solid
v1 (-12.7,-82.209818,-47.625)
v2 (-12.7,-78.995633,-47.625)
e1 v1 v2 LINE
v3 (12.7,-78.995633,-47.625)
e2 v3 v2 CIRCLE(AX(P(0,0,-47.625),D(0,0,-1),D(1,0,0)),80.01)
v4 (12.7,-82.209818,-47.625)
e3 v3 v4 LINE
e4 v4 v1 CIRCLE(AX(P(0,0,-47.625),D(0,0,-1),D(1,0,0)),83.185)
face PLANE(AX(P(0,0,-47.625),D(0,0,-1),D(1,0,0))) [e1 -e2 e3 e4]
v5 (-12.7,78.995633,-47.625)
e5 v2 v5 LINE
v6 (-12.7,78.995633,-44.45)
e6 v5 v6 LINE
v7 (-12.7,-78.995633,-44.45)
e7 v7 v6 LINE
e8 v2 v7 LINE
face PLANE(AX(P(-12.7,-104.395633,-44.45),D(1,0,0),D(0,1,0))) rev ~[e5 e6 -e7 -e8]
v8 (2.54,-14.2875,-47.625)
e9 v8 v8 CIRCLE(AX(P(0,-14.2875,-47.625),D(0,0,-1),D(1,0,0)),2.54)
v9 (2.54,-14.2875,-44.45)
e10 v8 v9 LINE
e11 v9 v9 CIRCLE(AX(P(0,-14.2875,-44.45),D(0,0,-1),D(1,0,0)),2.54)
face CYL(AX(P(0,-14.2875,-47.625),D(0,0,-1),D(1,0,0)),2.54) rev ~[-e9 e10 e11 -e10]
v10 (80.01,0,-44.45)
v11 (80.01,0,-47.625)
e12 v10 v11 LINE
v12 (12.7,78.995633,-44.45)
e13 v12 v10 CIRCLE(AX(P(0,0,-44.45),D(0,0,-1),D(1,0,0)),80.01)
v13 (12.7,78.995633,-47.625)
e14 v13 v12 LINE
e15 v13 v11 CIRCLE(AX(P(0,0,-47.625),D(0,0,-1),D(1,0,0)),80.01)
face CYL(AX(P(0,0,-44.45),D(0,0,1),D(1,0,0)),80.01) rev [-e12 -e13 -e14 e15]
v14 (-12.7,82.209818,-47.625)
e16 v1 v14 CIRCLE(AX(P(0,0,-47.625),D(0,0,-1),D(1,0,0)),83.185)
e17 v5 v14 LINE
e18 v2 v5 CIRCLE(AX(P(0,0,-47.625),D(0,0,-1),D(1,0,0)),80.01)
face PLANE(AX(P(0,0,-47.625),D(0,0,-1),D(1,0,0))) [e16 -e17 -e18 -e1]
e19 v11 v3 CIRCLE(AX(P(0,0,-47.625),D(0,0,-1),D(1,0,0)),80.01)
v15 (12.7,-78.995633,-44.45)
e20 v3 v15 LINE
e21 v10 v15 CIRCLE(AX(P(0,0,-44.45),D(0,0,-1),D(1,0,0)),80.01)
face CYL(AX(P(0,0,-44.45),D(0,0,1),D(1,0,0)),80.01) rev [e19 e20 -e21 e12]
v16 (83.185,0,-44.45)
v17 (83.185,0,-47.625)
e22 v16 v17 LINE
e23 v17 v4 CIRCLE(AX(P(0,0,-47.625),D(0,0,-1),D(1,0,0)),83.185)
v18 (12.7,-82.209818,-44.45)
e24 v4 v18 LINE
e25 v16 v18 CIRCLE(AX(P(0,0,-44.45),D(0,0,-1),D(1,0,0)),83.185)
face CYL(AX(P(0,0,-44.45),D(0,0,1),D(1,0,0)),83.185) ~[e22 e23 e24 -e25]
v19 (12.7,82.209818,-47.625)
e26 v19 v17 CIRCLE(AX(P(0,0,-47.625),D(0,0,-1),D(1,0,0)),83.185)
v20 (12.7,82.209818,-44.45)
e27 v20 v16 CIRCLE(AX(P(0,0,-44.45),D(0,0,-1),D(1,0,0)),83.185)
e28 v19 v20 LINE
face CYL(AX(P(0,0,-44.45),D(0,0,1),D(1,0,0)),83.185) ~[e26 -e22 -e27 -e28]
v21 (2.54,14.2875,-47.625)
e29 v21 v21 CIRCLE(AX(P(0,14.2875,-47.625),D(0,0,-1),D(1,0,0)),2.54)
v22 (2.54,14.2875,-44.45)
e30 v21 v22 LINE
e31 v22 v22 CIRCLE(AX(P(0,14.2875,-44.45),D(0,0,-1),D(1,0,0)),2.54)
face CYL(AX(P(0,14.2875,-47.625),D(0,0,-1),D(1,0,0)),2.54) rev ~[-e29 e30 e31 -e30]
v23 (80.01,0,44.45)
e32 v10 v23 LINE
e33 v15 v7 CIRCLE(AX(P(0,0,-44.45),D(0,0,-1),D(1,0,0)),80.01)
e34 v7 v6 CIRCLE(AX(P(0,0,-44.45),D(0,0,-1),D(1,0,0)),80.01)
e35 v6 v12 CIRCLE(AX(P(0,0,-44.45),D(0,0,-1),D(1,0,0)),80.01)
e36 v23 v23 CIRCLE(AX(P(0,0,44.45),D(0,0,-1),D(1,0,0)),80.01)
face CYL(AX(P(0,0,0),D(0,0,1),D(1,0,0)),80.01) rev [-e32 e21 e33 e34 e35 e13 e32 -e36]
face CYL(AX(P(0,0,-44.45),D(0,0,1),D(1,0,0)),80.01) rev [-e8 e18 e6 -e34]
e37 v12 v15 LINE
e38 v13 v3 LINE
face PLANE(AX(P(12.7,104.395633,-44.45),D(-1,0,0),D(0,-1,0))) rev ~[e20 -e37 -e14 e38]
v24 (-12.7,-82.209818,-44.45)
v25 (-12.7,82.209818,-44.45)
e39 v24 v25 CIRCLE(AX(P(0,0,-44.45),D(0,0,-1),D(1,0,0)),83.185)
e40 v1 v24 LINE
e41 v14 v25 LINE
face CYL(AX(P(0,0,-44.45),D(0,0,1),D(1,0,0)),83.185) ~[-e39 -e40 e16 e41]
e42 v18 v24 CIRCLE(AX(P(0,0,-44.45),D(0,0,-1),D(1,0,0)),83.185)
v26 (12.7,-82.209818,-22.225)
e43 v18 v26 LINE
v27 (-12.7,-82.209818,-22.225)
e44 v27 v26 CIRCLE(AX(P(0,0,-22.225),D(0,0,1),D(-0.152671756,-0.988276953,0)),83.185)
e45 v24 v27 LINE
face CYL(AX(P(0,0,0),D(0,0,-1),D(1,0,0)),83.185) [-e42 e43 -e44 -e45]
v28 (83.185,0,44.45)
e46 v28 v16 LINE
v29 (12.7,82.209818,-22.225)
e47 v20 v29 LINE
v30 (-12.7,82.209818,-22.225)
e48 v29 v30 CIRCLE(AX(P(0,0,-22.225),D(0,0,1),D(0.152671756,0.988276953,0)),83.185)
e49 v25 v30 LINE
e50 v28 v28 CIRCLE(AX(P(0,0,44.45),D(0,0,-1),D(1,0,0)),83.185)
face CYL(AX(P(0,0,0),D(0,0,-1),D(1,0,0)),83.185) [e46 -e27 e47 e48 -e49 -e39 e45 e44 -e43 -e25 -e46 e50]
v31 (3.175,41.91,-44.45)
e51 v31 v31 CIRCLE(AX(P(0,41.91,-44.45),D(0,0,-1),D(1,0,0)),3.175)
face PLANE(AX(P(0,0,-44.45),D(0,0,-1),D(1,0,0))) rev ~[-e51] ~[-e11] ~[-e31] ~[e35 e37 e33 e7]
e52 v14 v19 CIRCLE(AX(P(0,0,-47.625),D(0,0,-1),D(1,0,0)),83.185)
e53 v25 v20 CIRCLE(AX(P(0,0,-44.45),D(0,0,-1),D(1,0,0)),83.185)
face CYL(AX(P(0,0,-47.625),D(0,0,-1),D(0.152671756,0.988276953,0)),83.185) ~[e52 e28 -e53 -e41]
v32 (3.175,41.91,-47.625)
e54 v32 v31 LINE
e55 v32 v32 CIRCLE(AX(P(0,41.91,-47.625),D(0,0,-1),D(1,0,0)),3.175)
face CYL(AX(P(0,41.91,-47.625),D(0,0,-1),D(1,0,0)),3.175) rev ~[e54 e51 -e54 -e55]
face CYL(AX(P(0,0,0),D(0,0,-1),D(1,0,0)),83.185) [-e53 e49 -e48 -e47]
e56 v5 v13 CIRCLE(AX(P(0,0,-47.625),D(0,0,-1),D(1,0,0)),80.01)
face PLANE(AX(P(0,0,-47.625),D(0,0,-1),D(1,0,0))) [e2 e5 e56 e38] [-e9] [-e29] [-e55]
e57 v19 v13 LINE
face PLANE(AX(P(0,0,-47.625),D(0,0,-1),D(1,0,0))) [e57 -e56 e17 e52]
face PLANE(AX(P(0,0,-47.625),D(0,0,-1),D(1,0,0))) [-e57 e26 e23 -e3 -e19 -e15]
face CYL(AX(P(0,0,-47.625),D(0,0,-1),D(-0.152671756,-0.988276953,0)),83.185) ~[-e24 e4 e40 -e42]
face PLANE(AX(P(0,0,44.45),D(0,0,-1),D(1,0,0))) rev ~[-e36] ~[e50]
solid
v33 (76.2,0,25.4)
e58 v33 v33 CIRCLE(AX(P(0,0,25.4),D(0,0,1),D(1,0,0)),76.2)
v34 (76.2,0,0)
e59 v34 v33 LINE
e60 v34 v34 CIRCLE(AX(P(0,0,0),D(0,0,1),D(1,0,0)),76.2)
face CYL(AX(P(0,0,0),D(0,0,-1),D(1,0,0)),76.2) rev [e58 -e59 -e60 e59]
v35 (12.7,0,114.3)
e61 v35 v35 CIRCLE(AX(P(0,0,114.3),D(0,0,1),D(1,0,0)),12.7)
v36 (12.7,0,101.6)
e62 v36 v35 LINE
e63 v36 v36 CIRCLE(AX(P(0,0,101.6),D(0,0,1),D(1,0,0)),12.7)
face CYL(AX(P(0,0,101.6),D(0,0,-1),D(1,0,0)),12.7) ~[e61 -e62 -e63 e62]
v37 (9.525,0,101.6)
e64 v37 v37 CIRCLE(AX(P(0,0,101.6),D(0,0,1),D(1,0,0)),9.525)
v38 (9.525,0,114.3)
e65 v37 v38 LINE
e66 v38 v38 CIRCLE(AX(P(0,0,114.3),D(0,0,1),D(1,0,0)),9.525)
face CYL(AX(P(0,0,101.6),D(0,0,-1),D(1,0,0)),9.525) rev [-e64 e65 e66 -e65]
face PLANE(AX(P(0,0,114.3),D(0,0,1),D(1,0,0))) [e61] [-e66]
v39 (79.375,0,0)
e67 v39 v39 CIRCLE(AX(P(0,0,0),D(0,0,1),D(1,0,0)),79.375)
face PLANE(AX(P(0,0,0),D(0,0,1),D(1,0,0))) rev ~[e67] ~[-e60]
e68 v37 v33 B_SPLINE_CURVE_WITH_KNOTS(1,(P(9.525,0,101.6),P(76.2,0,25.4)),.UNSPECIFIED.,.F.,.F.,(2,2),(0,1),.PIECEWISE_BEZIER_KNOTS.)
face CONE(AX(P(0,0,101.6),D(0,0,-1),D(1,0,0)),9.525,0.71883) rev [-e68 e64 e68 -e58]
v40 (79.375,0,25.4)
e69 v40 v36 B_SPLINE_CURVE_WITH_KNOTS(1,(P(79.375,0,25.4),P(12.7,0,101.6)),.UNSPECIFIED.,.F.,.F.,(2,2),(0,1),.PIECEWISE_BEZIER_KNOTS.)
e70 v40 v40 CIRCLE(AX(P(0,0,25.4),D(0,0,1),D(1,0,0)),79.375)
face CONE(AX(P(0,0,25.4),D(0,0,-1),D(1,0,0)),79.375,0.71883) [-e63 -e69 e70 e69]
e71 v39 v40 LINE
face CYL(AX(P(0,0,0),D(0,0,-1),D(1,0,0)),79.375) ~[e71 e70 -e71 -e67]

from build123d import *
from build123d import SkipClean  # not in build123d's __all__

# Parameters (mm, degrees)
F0_R      = 79.375
F0_R_2    = 76.2
F1_DEPTH  = 25.4
F4_R      = 79.375
F3_R      = 12.7
F7_R      = 9.525
F6_R      = 76.2
F9_R      = 12.7
F9_R_2    = 9.525
F10_DEPTH = 12.7
F11_R     = 83.185
F11_R_2   = 80.01
F12_DEPTH = 44.45
F14_DEPTH = 3.175
F15_R     = 83.185
F15_R_2   = 80.01
F16_DEPTH = 3.175
F17_R     = 2.54
F17_R_2   = 3.175
F18_DEPTH = 161.926
F20_DEPTH = 25.4


with BuildPart() as f1:
    # F0 (on Top) → F1 (new body)
    with BuildSketch(Plane.XY):
        Circle(F0_R)
        Circle(F0_R_2, mode=Mode.SUBTRACT)
    extrude(amount=F1_DEPTH)

    # F4 (on face) → F5 section 0
    with BuildSketch(Plane.XY.offset(25.4)):
        Circle(F4_R)
    # F3 (on offset) → F5 section 1
    with BuildSketch(Plane.XY.offset(101.6)):
        Circle(F3_R)
    loft()

    # F7 (on face) → F8 section 0
    with BuildSketch(Plane.XY.offset(101.6)):
        Circle(F7_R)
    # F6 (on face) → F8 section 1
    with BuildSketch(Plane(origin=(0, 0, 25.4), x_dir=(1, 0, 0), z_dir=(0, 0, -1))):
        Circle(F6_R)
    loft(mode=Mode.SUBTRACT)

    # F9 (on face) → F10 (join)
    with BuildSketch(Plane.XY.offset(101.6)):
        Circle(F9_R)
        Circle(F9_R_2, mode=Mode.SUBTRACT)
    extrude(amount=F10_DEPTH)


with BuildPart() as f12:
    # F11 (on face) → F12 (new body, symmetric)
    with BuildSketch(Plane(origin=(0, 0, 0), x_dir=(1, 0, 0), z_dir=(0, 0, -1))):
        Circle(F11_R)
        Circle(F11_R_2, mode=Mode.SUBTRACT)
    extrude(amount=F12_DEPTH, both=True)

    # F13 (on face) → F14 (join)
    with BuildSketch(Plane(origin=(0, 0, -44.45), x_dir=(1, 0, 0), z_dir=(0, 0, -1))):
        Polygon((-12.7, 104.3956334236), (-12.7, 78.9956334236), (-12.7, -78.9956334236), (-12.7, -104.3956334236), (12.7, -104.3956334236), (12.7, -78.9956334236), (12.7, 78.9956334236), (12.7, 104.3956334236), align=None)
    extrude(amount=F14_DEPTH)

    # F15 (on face) → F16 (join)
    with BuildSketch(Plane(origin=(0, 0, -44.45), x_dir=(1, 0, 0), z_dir=(0, 0, -1))):
        Circle(F15_R)
        Circle(F15_R_2, mode=Mode.SUBTRACT)
    extrude(amount=F16_DEPTH)

    # F17 (on face) → F18 (cut, through all)
    with BuildSketch(Plane(origin=(0, 0, -47.625), x_dir=(1, 0, 0), z_dir=(0, 0, -1))):
        with Locations((0, 14.2875)):
            Circle(F17_R)
        with Locations((0, -14.2875)):
            Circle(F17_R)
        with Locations((0, -41.91)):
            Circle(F17_R_2)
    extrude(amount=-F18_DEPTH, mode=Mode.SUBTRACT)

    # F19 (on face) → F20 (cut)
    with BuildSketch(Plane(origin=(0, 0, -47.625), x_dir=(1, 0, 0), z_dir=(0, 0, -1))):
        with BuildLine():
            Line((12.7, 104.3956334236), (-12.7, 104.3956334236))
            Line((-12.7, 104.3956334236), (-12.7, 82.2098183005))
            ThreePointArc((-12.7, 82.2098183005), (0, 83.185), (12.7, 82.2098183005))
            Line((12.7, 82.2098183005), (12.7, 104.3956334236))
        make_face()
        with BuildLine():
            ThreePointArc((12.7, -82.2098183005), (0, -83.185), (-12.7, -82.2098183005))
            Line((-12.7, -82.2098183005), (-12.7, -104.3956334236))
            Line((-12.7, -104.3956334236), (12.7, -104.3956334236))
            Line((12.7, -104.3956334236), (12.7, -82.2098183005))
        make_face()
    with SkipClean():  # cleaning this boolean's faces spoils the solid; the shape is the same uncleaned
        extrude(amount=-F20_DEPTH, mode=Mode.SUBTRACT)


solid = Compound([f1.part, f12.part])
